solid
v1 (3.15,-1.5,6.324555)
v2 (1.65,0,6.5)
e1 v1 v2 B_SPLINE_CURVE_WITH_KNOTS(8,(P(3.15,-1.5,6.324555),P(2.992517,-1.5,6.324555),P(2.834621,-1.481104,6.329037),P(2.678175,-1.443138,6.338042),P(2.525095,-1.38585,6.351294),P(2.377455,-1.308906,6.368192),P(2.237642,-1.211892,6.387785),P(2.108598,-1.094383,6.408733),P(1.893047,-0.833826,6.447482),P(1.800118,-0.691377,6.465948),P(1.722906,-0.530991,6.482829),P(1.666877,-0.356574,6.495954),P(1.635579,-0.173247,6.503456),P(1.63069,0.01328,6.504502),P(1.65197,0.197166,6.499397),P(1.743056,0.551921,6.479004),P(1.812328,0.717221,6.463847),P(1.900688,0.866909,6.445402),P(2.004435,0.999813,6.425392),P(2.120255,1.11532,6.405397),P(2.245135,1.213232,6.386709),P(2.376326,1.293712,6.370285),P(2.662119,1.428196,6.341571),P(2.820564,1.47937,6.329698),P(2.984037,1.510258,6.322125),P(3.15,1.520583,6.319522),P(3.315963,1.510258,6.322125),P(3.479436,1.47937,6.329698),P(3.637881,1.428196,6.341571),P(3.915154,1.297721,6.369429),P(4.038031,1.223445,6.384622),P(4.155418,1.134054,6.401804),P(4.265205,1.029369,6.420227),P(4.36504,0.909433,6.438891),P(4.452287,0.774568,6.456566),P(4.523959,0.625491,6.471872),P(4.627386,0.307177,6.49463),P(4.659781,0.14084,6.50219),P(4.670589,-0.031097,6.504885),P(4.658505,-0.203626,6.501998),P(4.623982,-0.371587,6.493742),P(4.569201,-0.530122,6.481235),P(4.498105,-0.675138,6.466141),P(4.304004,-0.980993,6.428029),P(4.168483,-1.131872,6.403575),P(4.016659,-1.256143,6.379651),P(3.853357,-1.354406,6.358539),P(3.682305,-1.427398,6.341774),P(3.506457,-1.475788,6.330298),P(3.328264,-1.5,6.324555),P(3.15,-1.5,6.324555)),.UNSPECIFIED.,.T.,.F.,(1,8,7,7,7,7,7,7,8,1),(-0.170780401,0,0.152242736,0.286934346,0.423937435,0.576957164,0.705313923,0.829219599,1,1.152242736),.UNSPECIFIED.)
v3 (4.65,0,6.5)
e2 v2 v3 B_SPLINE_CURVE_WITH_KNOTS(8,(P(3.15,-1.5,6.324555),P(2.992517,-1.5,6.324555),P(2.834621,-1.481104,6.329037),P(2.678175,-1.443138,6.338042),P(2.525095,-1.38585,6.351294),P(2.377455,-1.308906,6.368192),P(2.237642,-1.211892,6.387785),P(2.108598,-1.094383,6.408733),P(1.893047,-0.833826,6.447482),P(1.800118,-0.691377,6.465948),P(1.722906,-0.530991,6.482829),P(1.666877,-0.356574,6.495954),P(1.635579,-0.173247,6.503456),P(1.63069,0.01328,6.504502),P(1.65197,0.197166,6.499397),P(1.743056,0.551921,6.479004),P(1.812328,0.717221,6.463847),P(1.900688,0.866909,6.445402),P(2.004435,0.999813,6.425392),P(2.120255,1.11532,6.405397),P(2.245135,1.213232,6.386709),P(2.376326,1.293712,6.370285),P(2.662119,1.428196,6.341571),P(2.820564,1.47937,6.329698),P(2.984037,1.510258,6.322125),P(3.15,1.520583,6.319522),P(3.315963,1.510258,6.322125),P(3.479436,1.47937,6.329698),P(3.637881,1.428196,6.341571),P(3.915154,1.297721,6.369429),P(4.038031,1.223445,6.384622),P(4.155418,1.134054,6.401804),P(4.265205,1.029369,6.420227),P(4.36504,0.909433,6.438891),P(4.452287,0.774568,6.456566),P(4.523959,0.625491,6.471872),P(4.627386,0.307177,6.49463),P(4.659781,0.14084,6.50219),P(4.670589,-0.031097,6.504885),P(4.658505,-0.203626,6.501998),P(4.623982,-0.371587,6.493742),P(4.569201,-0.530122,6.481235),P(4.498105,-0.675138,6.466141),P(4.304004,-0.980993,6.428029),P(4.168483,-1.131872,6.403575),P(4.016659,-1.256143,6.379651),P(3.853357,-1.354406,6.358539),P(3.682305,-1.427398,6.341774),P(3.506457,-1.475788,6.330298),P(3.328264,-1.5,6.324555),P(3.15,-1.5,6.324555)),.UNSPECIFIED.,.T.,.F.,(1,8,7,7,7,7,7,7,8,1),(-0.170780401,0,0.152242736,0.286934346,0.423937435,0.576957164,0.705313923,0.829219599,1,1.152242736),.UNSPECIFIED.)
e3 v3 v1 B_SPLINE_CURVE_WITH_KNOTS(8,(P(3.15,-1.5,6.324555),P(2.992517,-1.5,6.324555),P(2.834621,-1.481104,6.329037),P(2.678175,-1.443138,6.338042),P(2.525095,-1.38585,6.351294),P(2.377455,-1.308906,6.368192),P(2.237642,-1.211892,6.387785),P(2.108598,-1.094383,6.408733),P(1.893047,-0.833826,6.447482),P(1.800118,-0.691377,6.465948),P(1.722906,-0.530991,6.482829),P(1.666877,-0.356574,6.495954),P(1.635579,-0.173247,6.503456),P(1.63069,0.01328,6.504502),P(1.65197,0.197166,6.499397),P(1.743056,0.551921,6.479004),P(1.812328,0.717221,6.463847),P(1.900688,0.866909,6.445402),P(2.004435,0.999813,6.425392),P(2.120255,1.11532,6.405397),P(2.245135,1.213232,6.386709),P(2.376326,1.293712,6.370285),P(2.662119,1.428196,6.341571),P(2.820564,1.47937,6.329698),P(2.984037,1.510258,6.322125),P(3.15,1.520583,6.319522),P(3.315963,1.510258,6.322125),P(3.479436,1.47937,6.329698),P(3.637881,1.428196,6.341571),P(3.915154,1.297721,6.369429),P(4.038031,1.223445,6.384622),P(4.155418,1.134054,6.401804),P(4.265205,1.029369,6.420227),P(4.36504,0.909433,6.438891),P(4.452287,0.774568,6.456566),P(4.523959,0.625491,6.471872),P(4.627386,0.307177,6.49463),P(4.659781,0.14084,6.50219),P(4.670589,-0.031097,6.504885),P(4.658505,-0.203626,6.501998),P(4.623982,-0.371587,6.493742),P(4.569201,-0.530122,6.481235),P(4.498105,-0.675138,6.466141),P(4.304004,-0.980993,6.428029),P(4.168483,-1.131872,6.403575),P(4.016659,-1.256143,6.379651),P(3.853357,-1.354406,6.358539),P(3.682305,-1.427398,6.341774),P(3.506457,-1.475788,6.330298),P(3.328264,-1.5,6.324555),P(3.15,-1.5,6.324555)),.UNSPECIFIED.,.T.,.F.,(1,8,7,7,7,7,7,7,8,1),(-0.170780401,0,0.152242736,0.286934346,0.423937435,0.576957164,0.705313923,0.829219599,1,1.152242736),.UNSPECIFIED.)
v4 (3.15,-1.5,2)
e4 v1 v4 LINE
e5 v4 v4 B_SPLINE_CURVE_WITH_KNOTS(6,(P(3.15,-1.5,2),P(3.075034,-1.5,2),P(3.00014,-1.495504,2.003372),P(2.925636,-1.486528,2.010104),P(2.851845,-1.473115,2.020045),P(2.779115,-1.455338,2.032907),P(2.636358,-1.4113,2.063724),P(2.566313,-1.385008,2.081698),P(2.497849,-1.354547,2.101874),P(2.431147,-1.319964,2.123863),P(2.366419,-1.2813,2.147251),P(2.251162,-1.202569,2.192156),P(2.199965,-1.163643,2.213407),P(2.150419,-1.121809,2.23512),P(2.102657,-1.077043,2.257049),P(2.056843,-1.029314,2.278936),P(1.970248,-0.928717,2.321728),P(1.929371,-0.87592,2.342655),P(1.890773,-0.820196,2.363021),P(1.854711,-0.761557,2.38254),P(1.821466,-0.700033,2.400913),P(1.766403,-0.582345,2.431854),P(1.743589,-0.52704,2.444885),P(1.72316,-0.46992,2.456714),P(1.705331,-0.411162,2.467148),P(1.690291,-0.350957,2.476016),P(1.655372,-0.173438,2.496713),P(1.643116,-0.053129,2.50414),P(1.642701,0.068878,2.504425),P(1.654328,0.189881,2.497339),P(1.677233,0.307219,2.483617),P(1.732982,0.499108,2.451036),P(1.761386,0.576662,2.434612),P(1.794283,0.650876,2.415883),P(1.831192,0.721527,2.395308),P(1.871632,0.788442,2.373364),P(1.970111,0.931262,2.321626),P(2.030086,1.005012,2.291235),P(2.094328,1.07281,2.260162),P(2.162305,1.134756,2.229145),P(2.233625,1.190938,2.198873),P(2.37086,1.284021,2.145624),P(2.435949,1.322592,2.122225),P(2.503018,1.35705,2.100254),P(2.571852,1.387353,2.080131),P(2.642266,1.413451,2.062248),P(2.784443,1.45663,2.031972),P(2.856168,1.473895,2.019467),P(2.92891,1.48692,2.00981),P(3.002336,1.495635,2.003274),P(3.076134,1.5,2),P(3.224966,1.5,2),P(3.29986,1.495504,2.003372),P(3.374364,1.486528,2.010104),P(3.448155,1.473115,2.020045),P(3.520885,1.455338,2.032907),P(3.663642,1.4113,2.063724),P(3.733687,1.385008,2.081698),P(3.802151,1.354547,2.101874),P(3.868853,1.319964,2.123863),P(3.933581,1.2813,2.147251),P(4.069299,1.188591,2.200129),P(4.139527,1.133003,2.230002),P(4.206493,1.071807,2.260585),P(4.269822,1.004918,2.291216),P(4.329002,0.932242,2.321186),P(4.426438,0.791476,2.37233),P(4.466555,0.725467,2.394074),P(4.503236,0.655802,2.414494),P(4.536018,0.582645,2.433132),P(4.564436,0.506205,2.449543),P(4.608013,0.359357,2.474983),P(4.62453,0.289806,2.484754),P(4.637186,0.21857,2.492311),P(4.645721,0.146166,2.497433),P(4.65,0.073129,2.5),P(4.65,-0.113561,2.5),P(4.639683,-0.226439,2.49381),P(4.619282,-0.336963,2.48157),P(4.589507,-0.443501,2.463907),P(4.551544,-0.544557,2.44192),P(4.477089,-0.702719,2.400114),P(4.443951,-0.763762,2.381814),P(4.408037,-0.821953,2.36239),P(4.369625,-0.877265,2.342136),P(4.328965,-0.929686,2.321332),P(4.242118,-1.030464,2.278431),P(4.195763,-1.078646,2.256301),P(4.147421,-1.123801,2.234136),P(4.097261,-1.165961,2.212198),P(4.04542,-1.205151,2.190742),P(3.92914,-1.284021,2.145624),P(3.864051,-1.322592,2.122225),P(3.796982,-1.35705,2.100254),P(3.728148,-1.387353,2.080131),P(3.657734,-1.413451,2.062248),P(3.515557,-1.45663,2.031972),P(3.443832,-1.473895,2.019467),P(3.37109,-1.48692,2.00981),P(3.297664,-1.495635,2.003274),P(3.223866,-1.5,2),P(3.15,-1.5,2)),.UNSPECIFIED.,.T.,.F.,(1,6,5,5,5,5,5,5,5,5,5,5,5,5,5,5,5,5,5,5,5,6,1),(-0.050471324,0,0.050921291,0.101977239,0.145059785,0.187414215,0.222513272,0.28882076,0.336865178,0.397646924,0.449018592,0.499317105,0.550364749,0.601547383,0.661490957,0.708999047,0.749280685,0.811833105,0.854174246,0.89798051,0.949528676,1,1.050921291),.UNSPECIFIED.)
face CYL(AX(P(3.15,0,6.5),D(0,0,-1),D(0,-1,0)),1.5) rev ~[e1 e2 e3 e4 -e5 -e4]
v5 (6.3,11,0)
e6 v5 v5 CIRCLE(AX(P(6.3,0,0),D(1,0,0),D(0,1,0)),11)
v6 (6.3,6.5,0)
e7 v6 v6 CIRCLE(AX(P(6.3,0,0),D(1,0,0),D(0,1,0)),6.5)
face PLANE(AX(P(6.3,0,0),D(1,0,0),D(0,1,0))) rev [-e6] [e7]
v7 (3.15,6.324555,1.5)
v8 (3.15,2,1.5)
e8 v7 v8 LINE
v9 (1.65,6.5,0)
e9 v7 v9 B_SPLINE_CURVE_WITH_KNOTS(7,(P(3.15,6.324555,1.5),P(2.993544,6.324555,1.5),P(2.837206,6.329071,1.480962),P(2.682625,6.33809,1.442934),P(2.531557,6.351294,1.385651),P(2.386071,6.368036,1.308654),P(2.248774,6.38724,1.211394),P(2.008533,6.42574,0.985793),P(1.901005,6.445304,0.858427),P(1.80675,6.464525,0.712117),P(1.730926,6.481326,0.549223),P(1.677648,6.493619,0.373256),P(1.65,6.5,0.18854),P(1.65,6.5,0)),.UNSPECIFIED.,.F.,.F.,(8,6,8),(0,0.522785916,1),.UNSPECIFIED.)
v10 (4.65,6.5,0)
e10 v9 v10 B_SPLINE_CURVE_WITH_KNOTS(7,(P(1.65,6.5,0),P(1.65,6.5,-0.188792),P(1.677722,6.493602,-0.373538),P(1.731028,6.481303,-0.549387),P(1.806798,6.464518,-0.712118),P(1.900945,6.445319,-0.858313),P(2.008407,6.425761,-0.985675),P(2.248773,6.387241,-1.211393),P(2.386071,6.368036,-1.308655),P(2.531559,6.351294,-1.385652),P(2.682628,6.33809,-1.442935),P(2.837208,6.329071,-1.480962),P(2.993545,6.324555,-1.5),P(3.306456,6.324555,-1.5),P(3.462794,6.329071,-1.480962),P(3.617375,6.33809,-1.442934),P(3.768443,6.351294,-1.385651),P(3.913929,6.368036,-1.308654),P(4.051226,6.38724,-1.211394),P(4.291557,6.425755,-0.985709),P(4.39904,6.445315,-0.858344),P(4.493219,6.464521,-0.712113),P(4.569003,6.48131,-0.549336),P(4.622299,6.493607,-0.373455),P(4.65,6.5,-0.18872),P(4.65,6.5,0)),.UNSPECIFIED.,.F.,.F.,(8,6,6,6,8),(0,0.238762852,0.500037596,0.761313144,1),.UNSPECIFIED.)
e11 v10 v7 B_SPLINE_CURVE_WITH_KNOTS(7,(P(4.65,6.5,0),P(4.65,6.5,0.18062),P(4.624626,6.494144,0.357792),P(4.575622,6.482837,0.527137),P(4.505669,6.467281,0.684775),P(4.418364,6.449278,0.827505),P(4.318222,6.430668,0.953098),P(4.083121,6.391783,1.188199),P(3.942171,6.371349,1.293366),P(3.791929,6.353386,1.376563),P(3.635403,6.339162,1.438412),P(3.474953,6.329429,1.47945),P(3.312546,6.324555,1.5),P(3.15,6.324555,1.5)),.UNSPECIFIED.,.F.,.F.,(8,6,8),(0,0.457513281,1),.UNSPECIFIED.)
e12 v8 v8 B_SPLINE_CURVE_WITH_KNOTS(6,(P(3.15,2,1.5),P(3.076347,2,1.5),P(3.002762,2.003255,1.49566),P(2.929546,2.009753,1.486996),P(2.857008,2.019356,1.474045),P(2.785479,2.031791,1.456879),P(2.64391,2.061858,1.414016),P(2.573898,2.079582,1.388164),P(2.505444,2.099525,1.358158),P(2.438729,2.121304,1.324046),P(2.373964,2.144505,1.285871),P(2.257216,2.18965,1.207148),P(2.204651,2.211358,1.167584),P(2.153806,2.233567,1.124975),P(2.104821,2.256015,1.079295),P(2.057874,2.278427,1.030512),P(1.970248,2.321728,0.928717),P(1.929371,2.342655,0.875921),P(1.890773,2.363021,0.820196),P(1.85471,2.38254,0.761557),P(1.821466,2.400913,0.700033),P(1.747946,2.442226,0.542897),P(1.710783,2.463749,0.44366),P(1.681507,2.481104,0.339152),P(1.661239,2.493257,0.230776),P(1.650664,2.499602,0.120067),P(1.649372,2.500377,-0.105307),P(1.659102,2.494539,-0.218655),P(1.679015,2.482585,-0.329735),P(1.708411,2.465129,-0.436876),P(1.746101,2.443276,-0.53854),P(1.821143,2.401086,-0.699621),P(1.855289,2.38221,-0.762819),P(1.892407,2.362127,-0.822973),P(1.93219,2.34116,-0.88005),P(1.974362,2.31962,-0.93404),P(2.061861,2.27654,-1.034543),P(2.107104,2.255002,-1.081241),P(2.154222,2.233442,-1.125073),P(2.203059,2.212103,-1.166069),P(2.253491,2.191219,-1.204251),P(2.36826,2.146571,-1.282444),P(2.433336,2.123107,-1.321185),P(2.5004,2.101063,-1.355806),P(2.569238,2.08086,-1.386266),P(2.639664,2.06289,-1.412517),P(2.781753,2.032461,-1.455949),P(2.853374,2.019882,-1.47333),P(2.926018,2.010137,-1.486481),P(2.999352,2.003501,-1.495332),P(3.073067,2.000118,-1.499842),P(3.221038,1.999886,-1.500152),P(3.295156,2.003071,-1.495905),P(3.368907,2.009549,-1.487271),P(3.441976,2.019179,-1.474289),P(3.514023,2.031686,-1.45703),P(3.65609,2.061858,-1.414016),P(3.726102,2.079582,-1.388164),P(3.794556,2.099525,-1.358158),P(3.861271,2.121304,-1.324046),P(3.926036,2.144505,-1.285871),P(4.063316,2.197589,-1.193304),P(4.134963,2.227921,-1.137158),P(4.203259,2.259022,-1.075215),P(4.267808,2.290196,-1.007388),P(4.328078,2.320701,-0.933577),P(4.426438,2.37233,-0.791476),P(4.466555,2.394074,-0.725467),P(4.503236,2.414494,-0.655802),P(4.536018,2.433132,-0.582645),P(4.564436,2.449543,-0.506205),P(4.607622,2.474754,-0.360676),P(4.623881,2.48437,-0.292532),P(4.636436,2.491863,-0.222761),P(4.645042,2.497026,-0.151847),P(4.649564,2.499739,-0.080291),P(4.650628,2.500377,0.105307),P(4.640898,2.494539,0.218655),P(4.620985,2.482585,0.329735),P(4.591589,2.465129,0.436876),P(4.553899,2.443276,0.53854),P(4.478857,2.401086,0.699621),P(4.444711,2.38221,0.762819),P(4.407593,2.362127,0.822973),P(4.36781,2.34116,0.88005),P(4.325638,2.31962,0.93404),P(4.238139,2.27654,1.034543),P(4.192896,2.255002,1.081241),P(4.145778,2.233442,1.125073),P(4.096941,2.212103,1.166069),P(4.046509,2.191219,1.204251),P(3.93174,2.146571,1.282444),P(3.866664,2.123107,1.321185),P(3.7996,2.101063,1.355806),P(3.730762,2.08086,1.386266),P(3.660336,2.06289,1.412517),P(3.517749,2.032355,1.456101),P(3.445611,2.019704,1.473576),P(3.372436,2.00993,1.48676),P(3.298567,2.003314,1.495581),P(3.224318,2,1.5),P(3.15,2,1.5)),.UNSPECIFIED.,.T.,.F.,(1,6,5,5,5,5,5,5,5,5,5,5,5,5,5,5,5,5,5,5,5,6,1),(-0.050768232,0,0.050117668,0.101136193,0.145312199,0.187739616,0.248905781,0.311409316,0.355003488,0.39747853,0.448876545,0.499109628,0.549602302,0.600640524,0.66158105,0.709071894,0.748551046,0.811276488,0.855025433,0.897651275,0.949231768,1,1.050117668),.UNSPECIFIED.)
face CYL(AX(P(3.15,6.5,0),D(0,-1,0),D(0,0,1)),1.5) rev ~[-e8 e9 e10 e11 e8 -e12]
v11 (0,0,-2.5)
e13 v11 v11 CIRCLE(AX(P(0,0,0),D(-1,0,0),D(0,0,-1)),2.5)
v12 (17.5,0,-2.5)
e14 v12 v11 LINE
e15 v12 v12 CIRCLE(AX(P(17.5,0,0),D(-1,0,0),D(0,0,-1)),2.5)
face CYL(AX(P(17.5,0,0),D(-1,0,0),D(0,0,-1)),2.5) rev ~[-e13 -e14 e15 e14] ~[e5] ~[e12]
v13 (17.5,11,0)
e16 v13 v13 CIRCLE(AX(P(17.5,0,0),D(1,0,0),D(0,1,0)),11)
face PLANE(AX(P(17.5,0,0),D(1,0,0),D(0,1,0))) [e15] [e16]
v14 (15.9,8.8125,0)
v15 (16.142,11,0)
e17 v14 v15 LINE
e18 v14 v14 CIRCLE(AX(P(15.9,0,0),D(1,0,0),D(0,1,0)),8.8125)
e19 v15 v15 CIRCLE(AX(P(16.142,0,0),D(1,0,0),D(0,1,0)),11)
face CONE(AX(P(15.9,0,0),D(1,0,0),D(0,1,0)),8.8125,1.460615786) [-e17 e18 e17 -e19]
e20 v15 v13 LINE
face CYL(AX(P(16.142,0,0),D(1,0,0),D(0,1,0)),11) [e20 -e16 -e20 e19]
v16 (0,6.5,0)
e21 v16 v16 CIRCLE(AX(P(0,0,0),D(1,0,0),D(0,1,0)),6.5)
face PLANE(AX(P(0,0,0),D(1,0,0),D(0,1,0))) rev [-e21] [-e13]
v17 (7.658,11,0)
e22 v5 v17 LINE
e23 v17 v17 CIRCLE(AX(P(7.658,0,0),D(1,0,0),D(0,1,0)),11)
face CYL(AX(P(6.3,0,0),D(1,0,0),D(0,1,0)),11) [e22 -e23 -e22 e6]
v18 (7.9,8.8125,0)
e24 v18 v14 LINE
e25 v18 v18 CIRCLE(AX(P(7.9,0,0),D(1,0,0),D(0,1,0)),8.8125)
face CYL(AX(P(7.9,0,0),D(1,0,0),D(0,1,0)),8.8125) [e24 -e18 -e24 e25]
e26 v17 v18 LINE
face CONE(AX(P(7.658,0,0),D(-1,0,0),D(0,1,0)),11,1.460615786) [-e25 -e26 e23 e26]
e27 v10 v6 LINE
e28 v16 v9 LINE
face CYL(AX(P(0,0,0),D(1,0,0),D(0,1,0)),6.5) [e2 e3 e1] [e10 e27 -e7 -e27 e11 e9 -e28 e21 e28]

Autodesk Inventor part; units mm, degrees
ref_plane "YZ Plane" through (0, 0, 0) normal (1, 0, 0) x (0, 1, 0)
ref_plane "XZ Plane" through (0, 0, 0) normal (0, 1, 0) x (-1, 0, 0)
sketch "Sketch1" plane through (0, 0, 0) normal (0, 0, 1) x (1, 0, 0)
  line L0 (0, 0) -> (17.5, 0)
  line L1 (0, 0) -> (0, 6.5)
  line L2 (0, 6.5) -> (6.3, 6.5)
  line L3 (6.3, 6.5) -> (6.3, 11)
  line L4 (6.3, 11) -> (7.658, 11)
  line L5 (7.658, 11) -> (7.9, 8.8125)
  line L6 (7.9, 8.8125) -> (15.9, 8.8125)
  line L7 (15.9, 8.8125) -> (16.142, 11)
  line L8 (16.142, 11) -> (17.5, 11)
  line L9 (17.5, 11) -> (17.5, 0)
  line L10 (7.658, 11) -> (16.142, 11) construction
  line L11 (11.9, 8.8125) -> (11.9, 11) construction
  dimension "d0" = 13
  dimension "d2" = 22
  dimension "d3" = 11.2
  dimension "d4" = 1.358
  dimension "d5" = 8
  dimension "d6" = 1.358
  dimension "d7" = 17.625
  dimension "d8" = 6.3
  dimension "d9" = 17.5
revolve "Revolution1" add sketch "Sketch1" angle 360 about axis through (0, 0, 0) along (1, 0, 0)
sketch "Sketch2" plane through (17.5, 0, 0) normal (1, 0, 0) x (0, 0, -1)
  circle A0 centre (0, 0) radius 11 projected
hole "Hole1" at (17.5, 0, 0) direction (-1, 0, 0) diameter 5 end through all
ref_plane "Work Plane1" through (3.15, 0, 6.5) normal (0, 0, 1) x (1, 0, 0)
sketch "Sketch4" plane through (3.15, 0, 6.5) normal (0, 0, 1) x (1, 0, 0)
  line L0 (3.15, -6.5) -> (3.15, 6.5) projected
  line L1 (-3.15, -6.5) -> (-3.15, 6.5) projected
  line L2 (-3.15, 0) -> (3.15, 0) construction
  point P0 (0, 0)
hole "Hole2" at (3.15, 0, 6.5) direction (0, 0, -1) diameter 3 end up to surface
pattern_circular "Circular Pattern1" count 2 over 90 about axis through (-18.1966, 0, 0) along (-1, 0, 0) of "Hole2"
equation "\"d6\" = d4"
properties part number "GT2 Timing Pulley" material "Aluminum 6061"
